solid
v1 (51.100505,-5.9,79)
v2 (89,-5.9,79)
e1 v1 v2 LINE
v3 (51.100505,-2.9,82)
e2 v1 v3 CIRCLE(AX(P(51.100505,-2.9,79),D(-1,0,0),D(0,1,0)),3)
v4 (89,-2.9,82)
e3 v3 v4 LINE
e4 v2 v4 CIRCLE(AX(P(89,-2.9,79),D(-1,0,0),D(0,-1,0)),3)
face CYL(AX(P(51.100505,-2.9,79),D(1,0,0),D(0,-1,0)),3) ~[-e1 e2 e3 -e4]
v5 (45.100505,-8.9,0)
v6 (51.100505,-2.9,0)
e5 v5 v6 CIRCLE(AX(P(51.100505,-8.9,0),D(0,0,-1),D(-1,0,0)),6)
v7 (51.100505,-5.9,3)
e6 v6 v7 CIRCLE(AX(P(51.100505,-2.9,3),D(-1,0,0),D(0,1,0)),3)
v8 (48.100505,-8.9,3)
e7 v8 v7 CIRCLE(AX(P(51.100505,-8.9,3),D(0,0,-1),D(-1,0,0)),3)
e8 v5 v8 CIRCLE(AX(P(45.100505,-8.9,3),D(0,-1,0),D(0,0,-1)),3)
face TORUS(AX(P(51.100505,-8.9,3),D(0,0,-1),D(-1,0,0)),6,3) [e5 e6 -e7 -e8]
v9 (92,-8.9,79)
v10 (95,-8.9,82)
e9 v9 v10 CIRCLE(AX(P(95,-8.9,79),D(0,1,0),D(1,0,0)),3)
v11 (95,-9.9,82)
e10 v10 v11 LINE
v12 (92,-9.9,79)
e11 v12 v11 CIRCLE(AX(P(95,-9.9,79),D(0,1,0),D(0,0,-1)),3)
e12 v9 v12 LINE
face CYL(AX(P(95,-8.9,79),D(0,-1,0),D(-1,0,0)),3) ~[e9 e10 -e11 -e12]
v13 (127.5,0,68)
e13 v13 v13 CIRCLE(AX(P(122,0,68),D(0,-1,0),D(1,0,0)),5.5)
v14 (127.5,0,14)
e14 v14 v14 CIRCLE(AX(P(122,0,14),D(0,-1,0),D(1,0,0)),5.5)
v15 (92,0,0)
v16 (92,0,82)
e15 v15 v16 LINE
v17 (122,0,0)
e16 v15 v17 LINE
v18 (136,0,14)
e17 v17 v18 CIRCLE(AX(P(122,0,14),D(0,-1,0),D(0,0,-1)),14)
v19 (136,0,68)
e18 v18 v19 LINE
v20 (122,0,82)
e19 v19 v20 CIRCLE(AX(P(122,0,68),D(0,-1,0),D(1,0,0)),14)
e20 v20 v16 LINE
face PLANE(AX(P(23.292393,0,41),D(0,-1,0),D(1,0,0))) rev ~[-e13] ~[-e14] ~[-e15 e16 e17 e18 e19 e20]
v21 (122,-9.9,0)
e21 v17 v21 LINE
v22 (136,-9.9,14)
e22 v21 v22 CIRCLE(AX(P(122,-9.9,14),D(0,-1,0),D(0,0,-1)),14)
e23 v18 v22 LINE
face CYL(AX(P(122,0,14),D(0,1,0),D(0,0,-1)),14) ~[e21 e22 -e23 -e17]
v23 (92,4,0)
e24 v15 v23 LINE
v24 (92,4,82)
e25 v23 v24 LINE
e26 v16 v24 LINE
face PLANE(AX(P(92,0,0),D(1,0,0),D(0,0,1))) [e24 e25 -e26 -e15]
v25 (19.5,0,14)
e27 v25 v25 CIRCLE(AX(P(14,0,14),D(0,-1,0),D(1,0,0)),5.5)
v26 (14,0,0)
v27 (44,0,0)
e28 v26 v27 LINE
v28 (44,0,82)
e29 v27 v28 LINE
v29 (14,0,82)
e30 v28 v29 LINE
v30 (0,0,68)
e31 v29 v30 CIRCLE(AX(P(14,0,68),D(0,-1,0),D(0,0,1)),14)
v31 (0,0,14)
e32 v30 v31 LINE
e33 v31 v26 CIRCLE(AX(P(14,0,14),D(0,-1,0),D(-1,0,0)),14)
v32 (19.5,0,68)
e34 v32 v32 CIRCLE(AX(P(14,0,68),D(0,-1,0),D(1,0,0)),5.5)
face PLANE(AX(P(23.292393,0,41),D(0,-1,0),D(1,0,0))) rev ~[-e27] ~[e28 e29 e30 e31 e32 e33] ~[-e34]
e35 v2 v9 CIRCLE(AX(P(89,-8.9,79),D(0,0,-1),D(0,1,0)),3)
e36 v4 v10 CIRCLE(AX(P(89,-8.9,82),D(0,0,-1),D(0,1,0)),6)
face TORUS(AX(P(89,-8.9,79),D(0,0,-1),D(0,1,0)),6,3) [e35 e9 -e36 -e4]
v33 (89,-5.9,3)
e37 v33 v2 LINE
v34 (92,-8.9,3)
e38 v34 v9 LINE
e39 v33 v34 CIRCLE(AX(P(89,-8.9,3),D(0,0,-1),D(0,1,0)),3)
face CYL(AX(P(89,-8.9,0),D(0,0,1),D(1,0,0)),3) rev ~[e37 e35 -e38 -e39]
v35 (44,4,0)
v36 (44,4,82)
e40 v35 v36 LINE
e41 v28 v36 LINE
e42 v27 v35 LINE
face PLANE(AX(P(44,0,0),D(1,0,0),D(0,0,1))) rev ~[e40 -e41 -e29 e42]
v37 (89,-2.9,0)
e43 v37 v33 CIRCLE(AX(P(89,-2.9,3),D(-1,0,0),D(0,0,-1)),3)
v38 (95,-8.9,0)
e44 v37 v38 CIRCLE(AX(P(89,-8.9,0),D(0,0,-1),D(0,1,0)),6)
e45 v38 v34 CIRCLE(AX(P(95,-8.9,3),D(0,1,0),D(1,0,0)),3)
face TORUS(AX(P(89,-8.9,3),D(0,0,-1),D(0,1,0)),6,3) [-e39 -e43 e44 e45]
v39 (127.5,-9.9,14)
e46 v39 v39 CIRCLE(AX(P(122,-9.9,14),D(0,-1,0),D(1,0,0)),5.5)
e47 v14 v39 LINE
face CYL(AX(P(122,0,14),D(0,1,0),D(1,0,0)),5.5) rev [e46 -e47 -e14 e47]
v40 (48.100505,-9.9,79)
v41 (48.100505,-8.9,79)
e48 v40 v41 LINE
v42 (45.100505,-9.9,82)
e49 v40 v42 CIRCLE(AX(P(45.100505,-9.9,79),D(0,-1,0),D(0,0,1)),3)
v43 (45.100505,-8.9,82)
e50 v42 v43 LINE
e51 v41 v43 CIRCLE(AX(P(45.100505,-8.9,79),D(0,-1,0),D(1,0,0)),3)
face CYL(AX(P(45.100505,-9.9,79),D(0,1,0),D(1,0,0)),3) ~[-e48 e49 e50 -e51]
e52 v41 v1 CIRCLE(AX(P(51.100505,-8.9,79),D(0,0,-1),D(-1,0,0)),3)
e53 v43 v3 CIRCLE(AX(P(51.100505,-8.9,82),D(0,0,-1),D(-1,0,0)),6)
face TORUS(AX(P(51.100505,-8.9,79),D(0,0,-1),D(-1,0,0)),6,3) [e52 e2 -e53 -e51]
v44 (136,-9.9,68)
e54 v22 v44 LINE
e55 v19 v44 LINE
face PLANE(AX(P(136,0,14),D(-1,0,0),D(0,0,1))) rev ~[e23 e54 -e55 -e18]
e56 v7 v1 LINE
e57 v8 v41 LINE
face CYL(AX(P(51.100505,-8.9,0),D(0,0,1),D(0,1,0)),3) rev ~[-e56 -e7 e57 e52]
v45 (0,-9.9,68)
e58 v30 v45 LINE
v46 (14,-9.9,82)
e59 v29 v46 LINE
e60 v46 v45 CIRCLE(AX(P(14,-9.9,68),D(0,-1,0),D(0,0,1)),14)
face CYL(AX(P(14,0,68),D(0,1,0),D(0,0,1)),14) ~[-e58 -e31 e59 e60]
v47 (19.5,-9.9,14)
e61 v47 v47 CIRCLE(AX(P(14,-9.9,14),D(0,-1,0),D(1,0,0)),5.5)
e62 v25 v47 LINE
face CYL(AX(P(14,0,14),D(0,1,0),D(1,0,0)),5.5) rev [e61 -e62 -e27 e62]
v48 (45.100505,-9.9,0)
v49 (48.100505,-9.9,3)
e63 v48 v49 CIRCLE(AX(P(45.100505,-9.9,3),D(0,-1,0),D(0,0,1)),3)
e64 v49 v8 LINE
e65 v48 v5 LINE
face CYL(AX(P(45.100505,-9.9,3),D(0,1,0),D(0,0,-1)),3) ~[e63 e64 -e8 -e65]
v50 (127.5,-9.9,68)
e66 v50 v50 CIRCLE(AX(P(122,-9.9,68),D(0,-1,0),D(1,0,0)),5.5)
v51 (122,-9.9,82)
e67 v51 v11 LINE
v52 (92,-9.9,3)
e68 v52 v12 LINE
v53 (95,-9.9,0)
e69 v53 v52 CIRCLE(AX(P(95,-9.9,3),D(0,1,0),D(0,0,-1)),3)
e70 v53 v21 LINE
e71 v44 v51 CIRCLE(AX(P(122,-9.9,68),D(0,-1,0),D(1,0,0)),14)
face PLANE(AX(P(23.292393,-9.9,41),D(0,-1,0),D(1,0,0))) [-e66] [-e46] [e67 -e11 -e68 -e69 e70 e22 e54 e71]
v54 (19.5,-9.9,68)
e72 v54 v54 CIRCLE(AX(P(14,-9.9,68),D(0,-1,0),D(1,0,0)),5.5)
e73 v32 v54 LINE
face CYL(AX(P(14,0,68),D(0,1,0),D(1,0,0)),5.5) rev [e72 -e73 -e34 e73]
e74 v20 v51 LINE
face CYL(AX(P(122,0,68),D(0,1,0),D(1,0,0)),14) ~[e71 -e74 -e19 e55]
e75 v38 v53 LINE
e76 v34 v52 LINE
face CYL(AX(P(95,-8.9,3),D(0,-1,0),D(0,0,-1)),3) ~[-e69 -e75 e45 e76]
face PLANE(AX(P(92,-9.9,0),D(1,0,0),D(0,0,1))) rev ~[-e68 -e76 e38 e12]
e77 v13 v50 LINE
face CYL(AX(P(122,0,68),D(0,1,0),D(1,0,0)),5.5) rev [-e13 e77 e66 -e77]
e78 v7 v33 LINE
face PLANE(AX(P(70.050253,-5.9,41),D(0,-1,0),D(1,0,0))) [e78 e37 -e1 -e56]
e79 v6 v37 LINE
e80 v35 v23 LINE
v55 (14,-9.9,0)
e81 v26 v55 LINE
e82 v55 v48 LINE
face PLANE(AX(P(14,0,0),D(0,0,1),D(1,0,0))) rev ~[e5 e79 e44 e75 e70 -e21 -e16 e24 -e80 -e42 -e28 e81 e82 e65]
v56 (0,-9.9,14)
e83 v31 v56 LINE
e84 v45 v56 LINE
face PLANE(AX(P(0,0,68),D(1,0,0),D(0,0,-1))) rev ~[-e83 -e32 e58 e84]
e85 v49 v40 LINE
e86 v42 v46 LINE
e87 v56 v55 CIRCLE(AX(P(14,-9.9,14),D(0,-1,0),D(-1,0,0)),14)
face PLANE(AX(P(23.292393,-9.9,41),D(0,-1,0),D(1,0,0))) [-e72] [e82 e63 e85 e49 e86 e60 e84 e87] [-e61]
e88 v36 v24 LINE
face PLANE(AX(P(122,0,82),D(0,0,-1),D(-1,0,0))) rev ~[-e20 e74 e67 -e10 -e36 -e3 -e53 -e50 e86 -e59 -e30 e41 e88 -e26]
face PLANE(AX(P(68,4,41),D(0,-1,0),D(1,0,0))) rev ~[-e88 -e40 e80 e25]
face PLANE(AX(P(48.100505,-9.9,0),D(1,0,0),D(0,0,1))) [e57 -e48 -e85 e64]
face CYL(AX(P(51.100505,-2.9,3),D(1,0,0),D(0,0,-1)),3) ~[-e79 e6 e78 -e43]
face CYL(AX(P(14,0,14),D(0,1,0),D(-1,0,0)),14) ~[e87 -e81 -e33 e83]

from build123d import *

# Parameters (mm, degrees)
F0_W     = 48
F0_H     = 82
F1_DEPTH = 4
F0_R     = 5.5
F2_DEPTH = 9.9
F3_W     = 43.8994949366
F3_H     = 82
F4_DEPTH = 4
F5_F1_R  = 3
F5_F2_R  = 3


with BuildPart() as f1:
    # F0 (on Front) → F1 (new body)
    with BuildSketch(Plane.XZ):
        with Locations((68, 41)):
            Rectangle(F0_W, F0_H)
    extrude(amount=-F1_DEPTH)

    # F0 (on Front) → F2 (join)
    with BuildSketch(Plane.XZ):
        with BuildLine():
            ThreePointArc((0, 14), (4.1005050634, 4.1005050634), (14, 0))
            Line((14, 0), (44, 0))
            Line((44, 0), (44, 82))
            Line((44, 82), (14, 82))
            ThreePointArc((14, 82), (4.1005050634, 77.8994949366), (0, 68))
            Line((0, 68), (0, 14))
        make_face()
        with Locations((14, 14)):
            Circle(F0_R, mode=Mode.SUBTRACT)
        with Locations((14, 68)):
            Circle(F0_R, mode=Mode.SUBTRACT)
        with Locations((68, 41)):
            Rectangle(F0_W, F0_H)
        with BuildLine():
            Line((92, 82), (92, 0))
            Line((92, 0), (122, 0))
            ThreePointArc((122, 0), (131.8994949366, 4.1005050634), (136, 14))
            Line((136, 14), (136, 68))
            ThreePointArc((136, 68), (131.8994949366, 77.8994949366), (122, 82))
            Line((122, 82), (92, 82))
        make_face()
        with Locations((122, 14)):
            Circle(F0_R, mode=Mode.SUBTRACT)
        with Locations((122, 68)):
            Circle(F0_R, mode=Mode.SUBTRACT)
    extrude(amount=F2_DEPTH)

    # F3 (on face) → F4 (cut)
    with BuildSketch(Plane.XZ.offset(9.9)):
        with Locations((70.0502525317, 41)):
            Rectangle(F3_W, F3_H)
    extrude(amount=-F4_DEPTH, mode=Mode.SUBTRACT)

    # F5: fillet of radius 3 on 4 edges, made by hand

    # F5_f1
    f5_f1_edges = [f1.edges().sort_by_distance(p)[0] for p in [
        (48.1005050634, -5.9, 41),
        (92, -5.9, 41),
    ]]
    fillet(f5_f1_edges, radius=F5_F1_R)

    # F5_f2
    f5_f2_edges = [f1.edges().sort_by_distance(p)[0] for p in [
        (70.0502525317, -5.9, 0),
        (70.0502525317, -5.9, 82),
        (91.1213203436, -6.7786796564, 82),
        (48.9791847198, -6.7786796564, 82),
        (48.9791847198, -6.7786796564, 0),
        (91.1213203436, -6.7786796564, 0),
    ]]
    fillet(f5_f2_edges, radius=F5_F2_R)


solid = f1.part
